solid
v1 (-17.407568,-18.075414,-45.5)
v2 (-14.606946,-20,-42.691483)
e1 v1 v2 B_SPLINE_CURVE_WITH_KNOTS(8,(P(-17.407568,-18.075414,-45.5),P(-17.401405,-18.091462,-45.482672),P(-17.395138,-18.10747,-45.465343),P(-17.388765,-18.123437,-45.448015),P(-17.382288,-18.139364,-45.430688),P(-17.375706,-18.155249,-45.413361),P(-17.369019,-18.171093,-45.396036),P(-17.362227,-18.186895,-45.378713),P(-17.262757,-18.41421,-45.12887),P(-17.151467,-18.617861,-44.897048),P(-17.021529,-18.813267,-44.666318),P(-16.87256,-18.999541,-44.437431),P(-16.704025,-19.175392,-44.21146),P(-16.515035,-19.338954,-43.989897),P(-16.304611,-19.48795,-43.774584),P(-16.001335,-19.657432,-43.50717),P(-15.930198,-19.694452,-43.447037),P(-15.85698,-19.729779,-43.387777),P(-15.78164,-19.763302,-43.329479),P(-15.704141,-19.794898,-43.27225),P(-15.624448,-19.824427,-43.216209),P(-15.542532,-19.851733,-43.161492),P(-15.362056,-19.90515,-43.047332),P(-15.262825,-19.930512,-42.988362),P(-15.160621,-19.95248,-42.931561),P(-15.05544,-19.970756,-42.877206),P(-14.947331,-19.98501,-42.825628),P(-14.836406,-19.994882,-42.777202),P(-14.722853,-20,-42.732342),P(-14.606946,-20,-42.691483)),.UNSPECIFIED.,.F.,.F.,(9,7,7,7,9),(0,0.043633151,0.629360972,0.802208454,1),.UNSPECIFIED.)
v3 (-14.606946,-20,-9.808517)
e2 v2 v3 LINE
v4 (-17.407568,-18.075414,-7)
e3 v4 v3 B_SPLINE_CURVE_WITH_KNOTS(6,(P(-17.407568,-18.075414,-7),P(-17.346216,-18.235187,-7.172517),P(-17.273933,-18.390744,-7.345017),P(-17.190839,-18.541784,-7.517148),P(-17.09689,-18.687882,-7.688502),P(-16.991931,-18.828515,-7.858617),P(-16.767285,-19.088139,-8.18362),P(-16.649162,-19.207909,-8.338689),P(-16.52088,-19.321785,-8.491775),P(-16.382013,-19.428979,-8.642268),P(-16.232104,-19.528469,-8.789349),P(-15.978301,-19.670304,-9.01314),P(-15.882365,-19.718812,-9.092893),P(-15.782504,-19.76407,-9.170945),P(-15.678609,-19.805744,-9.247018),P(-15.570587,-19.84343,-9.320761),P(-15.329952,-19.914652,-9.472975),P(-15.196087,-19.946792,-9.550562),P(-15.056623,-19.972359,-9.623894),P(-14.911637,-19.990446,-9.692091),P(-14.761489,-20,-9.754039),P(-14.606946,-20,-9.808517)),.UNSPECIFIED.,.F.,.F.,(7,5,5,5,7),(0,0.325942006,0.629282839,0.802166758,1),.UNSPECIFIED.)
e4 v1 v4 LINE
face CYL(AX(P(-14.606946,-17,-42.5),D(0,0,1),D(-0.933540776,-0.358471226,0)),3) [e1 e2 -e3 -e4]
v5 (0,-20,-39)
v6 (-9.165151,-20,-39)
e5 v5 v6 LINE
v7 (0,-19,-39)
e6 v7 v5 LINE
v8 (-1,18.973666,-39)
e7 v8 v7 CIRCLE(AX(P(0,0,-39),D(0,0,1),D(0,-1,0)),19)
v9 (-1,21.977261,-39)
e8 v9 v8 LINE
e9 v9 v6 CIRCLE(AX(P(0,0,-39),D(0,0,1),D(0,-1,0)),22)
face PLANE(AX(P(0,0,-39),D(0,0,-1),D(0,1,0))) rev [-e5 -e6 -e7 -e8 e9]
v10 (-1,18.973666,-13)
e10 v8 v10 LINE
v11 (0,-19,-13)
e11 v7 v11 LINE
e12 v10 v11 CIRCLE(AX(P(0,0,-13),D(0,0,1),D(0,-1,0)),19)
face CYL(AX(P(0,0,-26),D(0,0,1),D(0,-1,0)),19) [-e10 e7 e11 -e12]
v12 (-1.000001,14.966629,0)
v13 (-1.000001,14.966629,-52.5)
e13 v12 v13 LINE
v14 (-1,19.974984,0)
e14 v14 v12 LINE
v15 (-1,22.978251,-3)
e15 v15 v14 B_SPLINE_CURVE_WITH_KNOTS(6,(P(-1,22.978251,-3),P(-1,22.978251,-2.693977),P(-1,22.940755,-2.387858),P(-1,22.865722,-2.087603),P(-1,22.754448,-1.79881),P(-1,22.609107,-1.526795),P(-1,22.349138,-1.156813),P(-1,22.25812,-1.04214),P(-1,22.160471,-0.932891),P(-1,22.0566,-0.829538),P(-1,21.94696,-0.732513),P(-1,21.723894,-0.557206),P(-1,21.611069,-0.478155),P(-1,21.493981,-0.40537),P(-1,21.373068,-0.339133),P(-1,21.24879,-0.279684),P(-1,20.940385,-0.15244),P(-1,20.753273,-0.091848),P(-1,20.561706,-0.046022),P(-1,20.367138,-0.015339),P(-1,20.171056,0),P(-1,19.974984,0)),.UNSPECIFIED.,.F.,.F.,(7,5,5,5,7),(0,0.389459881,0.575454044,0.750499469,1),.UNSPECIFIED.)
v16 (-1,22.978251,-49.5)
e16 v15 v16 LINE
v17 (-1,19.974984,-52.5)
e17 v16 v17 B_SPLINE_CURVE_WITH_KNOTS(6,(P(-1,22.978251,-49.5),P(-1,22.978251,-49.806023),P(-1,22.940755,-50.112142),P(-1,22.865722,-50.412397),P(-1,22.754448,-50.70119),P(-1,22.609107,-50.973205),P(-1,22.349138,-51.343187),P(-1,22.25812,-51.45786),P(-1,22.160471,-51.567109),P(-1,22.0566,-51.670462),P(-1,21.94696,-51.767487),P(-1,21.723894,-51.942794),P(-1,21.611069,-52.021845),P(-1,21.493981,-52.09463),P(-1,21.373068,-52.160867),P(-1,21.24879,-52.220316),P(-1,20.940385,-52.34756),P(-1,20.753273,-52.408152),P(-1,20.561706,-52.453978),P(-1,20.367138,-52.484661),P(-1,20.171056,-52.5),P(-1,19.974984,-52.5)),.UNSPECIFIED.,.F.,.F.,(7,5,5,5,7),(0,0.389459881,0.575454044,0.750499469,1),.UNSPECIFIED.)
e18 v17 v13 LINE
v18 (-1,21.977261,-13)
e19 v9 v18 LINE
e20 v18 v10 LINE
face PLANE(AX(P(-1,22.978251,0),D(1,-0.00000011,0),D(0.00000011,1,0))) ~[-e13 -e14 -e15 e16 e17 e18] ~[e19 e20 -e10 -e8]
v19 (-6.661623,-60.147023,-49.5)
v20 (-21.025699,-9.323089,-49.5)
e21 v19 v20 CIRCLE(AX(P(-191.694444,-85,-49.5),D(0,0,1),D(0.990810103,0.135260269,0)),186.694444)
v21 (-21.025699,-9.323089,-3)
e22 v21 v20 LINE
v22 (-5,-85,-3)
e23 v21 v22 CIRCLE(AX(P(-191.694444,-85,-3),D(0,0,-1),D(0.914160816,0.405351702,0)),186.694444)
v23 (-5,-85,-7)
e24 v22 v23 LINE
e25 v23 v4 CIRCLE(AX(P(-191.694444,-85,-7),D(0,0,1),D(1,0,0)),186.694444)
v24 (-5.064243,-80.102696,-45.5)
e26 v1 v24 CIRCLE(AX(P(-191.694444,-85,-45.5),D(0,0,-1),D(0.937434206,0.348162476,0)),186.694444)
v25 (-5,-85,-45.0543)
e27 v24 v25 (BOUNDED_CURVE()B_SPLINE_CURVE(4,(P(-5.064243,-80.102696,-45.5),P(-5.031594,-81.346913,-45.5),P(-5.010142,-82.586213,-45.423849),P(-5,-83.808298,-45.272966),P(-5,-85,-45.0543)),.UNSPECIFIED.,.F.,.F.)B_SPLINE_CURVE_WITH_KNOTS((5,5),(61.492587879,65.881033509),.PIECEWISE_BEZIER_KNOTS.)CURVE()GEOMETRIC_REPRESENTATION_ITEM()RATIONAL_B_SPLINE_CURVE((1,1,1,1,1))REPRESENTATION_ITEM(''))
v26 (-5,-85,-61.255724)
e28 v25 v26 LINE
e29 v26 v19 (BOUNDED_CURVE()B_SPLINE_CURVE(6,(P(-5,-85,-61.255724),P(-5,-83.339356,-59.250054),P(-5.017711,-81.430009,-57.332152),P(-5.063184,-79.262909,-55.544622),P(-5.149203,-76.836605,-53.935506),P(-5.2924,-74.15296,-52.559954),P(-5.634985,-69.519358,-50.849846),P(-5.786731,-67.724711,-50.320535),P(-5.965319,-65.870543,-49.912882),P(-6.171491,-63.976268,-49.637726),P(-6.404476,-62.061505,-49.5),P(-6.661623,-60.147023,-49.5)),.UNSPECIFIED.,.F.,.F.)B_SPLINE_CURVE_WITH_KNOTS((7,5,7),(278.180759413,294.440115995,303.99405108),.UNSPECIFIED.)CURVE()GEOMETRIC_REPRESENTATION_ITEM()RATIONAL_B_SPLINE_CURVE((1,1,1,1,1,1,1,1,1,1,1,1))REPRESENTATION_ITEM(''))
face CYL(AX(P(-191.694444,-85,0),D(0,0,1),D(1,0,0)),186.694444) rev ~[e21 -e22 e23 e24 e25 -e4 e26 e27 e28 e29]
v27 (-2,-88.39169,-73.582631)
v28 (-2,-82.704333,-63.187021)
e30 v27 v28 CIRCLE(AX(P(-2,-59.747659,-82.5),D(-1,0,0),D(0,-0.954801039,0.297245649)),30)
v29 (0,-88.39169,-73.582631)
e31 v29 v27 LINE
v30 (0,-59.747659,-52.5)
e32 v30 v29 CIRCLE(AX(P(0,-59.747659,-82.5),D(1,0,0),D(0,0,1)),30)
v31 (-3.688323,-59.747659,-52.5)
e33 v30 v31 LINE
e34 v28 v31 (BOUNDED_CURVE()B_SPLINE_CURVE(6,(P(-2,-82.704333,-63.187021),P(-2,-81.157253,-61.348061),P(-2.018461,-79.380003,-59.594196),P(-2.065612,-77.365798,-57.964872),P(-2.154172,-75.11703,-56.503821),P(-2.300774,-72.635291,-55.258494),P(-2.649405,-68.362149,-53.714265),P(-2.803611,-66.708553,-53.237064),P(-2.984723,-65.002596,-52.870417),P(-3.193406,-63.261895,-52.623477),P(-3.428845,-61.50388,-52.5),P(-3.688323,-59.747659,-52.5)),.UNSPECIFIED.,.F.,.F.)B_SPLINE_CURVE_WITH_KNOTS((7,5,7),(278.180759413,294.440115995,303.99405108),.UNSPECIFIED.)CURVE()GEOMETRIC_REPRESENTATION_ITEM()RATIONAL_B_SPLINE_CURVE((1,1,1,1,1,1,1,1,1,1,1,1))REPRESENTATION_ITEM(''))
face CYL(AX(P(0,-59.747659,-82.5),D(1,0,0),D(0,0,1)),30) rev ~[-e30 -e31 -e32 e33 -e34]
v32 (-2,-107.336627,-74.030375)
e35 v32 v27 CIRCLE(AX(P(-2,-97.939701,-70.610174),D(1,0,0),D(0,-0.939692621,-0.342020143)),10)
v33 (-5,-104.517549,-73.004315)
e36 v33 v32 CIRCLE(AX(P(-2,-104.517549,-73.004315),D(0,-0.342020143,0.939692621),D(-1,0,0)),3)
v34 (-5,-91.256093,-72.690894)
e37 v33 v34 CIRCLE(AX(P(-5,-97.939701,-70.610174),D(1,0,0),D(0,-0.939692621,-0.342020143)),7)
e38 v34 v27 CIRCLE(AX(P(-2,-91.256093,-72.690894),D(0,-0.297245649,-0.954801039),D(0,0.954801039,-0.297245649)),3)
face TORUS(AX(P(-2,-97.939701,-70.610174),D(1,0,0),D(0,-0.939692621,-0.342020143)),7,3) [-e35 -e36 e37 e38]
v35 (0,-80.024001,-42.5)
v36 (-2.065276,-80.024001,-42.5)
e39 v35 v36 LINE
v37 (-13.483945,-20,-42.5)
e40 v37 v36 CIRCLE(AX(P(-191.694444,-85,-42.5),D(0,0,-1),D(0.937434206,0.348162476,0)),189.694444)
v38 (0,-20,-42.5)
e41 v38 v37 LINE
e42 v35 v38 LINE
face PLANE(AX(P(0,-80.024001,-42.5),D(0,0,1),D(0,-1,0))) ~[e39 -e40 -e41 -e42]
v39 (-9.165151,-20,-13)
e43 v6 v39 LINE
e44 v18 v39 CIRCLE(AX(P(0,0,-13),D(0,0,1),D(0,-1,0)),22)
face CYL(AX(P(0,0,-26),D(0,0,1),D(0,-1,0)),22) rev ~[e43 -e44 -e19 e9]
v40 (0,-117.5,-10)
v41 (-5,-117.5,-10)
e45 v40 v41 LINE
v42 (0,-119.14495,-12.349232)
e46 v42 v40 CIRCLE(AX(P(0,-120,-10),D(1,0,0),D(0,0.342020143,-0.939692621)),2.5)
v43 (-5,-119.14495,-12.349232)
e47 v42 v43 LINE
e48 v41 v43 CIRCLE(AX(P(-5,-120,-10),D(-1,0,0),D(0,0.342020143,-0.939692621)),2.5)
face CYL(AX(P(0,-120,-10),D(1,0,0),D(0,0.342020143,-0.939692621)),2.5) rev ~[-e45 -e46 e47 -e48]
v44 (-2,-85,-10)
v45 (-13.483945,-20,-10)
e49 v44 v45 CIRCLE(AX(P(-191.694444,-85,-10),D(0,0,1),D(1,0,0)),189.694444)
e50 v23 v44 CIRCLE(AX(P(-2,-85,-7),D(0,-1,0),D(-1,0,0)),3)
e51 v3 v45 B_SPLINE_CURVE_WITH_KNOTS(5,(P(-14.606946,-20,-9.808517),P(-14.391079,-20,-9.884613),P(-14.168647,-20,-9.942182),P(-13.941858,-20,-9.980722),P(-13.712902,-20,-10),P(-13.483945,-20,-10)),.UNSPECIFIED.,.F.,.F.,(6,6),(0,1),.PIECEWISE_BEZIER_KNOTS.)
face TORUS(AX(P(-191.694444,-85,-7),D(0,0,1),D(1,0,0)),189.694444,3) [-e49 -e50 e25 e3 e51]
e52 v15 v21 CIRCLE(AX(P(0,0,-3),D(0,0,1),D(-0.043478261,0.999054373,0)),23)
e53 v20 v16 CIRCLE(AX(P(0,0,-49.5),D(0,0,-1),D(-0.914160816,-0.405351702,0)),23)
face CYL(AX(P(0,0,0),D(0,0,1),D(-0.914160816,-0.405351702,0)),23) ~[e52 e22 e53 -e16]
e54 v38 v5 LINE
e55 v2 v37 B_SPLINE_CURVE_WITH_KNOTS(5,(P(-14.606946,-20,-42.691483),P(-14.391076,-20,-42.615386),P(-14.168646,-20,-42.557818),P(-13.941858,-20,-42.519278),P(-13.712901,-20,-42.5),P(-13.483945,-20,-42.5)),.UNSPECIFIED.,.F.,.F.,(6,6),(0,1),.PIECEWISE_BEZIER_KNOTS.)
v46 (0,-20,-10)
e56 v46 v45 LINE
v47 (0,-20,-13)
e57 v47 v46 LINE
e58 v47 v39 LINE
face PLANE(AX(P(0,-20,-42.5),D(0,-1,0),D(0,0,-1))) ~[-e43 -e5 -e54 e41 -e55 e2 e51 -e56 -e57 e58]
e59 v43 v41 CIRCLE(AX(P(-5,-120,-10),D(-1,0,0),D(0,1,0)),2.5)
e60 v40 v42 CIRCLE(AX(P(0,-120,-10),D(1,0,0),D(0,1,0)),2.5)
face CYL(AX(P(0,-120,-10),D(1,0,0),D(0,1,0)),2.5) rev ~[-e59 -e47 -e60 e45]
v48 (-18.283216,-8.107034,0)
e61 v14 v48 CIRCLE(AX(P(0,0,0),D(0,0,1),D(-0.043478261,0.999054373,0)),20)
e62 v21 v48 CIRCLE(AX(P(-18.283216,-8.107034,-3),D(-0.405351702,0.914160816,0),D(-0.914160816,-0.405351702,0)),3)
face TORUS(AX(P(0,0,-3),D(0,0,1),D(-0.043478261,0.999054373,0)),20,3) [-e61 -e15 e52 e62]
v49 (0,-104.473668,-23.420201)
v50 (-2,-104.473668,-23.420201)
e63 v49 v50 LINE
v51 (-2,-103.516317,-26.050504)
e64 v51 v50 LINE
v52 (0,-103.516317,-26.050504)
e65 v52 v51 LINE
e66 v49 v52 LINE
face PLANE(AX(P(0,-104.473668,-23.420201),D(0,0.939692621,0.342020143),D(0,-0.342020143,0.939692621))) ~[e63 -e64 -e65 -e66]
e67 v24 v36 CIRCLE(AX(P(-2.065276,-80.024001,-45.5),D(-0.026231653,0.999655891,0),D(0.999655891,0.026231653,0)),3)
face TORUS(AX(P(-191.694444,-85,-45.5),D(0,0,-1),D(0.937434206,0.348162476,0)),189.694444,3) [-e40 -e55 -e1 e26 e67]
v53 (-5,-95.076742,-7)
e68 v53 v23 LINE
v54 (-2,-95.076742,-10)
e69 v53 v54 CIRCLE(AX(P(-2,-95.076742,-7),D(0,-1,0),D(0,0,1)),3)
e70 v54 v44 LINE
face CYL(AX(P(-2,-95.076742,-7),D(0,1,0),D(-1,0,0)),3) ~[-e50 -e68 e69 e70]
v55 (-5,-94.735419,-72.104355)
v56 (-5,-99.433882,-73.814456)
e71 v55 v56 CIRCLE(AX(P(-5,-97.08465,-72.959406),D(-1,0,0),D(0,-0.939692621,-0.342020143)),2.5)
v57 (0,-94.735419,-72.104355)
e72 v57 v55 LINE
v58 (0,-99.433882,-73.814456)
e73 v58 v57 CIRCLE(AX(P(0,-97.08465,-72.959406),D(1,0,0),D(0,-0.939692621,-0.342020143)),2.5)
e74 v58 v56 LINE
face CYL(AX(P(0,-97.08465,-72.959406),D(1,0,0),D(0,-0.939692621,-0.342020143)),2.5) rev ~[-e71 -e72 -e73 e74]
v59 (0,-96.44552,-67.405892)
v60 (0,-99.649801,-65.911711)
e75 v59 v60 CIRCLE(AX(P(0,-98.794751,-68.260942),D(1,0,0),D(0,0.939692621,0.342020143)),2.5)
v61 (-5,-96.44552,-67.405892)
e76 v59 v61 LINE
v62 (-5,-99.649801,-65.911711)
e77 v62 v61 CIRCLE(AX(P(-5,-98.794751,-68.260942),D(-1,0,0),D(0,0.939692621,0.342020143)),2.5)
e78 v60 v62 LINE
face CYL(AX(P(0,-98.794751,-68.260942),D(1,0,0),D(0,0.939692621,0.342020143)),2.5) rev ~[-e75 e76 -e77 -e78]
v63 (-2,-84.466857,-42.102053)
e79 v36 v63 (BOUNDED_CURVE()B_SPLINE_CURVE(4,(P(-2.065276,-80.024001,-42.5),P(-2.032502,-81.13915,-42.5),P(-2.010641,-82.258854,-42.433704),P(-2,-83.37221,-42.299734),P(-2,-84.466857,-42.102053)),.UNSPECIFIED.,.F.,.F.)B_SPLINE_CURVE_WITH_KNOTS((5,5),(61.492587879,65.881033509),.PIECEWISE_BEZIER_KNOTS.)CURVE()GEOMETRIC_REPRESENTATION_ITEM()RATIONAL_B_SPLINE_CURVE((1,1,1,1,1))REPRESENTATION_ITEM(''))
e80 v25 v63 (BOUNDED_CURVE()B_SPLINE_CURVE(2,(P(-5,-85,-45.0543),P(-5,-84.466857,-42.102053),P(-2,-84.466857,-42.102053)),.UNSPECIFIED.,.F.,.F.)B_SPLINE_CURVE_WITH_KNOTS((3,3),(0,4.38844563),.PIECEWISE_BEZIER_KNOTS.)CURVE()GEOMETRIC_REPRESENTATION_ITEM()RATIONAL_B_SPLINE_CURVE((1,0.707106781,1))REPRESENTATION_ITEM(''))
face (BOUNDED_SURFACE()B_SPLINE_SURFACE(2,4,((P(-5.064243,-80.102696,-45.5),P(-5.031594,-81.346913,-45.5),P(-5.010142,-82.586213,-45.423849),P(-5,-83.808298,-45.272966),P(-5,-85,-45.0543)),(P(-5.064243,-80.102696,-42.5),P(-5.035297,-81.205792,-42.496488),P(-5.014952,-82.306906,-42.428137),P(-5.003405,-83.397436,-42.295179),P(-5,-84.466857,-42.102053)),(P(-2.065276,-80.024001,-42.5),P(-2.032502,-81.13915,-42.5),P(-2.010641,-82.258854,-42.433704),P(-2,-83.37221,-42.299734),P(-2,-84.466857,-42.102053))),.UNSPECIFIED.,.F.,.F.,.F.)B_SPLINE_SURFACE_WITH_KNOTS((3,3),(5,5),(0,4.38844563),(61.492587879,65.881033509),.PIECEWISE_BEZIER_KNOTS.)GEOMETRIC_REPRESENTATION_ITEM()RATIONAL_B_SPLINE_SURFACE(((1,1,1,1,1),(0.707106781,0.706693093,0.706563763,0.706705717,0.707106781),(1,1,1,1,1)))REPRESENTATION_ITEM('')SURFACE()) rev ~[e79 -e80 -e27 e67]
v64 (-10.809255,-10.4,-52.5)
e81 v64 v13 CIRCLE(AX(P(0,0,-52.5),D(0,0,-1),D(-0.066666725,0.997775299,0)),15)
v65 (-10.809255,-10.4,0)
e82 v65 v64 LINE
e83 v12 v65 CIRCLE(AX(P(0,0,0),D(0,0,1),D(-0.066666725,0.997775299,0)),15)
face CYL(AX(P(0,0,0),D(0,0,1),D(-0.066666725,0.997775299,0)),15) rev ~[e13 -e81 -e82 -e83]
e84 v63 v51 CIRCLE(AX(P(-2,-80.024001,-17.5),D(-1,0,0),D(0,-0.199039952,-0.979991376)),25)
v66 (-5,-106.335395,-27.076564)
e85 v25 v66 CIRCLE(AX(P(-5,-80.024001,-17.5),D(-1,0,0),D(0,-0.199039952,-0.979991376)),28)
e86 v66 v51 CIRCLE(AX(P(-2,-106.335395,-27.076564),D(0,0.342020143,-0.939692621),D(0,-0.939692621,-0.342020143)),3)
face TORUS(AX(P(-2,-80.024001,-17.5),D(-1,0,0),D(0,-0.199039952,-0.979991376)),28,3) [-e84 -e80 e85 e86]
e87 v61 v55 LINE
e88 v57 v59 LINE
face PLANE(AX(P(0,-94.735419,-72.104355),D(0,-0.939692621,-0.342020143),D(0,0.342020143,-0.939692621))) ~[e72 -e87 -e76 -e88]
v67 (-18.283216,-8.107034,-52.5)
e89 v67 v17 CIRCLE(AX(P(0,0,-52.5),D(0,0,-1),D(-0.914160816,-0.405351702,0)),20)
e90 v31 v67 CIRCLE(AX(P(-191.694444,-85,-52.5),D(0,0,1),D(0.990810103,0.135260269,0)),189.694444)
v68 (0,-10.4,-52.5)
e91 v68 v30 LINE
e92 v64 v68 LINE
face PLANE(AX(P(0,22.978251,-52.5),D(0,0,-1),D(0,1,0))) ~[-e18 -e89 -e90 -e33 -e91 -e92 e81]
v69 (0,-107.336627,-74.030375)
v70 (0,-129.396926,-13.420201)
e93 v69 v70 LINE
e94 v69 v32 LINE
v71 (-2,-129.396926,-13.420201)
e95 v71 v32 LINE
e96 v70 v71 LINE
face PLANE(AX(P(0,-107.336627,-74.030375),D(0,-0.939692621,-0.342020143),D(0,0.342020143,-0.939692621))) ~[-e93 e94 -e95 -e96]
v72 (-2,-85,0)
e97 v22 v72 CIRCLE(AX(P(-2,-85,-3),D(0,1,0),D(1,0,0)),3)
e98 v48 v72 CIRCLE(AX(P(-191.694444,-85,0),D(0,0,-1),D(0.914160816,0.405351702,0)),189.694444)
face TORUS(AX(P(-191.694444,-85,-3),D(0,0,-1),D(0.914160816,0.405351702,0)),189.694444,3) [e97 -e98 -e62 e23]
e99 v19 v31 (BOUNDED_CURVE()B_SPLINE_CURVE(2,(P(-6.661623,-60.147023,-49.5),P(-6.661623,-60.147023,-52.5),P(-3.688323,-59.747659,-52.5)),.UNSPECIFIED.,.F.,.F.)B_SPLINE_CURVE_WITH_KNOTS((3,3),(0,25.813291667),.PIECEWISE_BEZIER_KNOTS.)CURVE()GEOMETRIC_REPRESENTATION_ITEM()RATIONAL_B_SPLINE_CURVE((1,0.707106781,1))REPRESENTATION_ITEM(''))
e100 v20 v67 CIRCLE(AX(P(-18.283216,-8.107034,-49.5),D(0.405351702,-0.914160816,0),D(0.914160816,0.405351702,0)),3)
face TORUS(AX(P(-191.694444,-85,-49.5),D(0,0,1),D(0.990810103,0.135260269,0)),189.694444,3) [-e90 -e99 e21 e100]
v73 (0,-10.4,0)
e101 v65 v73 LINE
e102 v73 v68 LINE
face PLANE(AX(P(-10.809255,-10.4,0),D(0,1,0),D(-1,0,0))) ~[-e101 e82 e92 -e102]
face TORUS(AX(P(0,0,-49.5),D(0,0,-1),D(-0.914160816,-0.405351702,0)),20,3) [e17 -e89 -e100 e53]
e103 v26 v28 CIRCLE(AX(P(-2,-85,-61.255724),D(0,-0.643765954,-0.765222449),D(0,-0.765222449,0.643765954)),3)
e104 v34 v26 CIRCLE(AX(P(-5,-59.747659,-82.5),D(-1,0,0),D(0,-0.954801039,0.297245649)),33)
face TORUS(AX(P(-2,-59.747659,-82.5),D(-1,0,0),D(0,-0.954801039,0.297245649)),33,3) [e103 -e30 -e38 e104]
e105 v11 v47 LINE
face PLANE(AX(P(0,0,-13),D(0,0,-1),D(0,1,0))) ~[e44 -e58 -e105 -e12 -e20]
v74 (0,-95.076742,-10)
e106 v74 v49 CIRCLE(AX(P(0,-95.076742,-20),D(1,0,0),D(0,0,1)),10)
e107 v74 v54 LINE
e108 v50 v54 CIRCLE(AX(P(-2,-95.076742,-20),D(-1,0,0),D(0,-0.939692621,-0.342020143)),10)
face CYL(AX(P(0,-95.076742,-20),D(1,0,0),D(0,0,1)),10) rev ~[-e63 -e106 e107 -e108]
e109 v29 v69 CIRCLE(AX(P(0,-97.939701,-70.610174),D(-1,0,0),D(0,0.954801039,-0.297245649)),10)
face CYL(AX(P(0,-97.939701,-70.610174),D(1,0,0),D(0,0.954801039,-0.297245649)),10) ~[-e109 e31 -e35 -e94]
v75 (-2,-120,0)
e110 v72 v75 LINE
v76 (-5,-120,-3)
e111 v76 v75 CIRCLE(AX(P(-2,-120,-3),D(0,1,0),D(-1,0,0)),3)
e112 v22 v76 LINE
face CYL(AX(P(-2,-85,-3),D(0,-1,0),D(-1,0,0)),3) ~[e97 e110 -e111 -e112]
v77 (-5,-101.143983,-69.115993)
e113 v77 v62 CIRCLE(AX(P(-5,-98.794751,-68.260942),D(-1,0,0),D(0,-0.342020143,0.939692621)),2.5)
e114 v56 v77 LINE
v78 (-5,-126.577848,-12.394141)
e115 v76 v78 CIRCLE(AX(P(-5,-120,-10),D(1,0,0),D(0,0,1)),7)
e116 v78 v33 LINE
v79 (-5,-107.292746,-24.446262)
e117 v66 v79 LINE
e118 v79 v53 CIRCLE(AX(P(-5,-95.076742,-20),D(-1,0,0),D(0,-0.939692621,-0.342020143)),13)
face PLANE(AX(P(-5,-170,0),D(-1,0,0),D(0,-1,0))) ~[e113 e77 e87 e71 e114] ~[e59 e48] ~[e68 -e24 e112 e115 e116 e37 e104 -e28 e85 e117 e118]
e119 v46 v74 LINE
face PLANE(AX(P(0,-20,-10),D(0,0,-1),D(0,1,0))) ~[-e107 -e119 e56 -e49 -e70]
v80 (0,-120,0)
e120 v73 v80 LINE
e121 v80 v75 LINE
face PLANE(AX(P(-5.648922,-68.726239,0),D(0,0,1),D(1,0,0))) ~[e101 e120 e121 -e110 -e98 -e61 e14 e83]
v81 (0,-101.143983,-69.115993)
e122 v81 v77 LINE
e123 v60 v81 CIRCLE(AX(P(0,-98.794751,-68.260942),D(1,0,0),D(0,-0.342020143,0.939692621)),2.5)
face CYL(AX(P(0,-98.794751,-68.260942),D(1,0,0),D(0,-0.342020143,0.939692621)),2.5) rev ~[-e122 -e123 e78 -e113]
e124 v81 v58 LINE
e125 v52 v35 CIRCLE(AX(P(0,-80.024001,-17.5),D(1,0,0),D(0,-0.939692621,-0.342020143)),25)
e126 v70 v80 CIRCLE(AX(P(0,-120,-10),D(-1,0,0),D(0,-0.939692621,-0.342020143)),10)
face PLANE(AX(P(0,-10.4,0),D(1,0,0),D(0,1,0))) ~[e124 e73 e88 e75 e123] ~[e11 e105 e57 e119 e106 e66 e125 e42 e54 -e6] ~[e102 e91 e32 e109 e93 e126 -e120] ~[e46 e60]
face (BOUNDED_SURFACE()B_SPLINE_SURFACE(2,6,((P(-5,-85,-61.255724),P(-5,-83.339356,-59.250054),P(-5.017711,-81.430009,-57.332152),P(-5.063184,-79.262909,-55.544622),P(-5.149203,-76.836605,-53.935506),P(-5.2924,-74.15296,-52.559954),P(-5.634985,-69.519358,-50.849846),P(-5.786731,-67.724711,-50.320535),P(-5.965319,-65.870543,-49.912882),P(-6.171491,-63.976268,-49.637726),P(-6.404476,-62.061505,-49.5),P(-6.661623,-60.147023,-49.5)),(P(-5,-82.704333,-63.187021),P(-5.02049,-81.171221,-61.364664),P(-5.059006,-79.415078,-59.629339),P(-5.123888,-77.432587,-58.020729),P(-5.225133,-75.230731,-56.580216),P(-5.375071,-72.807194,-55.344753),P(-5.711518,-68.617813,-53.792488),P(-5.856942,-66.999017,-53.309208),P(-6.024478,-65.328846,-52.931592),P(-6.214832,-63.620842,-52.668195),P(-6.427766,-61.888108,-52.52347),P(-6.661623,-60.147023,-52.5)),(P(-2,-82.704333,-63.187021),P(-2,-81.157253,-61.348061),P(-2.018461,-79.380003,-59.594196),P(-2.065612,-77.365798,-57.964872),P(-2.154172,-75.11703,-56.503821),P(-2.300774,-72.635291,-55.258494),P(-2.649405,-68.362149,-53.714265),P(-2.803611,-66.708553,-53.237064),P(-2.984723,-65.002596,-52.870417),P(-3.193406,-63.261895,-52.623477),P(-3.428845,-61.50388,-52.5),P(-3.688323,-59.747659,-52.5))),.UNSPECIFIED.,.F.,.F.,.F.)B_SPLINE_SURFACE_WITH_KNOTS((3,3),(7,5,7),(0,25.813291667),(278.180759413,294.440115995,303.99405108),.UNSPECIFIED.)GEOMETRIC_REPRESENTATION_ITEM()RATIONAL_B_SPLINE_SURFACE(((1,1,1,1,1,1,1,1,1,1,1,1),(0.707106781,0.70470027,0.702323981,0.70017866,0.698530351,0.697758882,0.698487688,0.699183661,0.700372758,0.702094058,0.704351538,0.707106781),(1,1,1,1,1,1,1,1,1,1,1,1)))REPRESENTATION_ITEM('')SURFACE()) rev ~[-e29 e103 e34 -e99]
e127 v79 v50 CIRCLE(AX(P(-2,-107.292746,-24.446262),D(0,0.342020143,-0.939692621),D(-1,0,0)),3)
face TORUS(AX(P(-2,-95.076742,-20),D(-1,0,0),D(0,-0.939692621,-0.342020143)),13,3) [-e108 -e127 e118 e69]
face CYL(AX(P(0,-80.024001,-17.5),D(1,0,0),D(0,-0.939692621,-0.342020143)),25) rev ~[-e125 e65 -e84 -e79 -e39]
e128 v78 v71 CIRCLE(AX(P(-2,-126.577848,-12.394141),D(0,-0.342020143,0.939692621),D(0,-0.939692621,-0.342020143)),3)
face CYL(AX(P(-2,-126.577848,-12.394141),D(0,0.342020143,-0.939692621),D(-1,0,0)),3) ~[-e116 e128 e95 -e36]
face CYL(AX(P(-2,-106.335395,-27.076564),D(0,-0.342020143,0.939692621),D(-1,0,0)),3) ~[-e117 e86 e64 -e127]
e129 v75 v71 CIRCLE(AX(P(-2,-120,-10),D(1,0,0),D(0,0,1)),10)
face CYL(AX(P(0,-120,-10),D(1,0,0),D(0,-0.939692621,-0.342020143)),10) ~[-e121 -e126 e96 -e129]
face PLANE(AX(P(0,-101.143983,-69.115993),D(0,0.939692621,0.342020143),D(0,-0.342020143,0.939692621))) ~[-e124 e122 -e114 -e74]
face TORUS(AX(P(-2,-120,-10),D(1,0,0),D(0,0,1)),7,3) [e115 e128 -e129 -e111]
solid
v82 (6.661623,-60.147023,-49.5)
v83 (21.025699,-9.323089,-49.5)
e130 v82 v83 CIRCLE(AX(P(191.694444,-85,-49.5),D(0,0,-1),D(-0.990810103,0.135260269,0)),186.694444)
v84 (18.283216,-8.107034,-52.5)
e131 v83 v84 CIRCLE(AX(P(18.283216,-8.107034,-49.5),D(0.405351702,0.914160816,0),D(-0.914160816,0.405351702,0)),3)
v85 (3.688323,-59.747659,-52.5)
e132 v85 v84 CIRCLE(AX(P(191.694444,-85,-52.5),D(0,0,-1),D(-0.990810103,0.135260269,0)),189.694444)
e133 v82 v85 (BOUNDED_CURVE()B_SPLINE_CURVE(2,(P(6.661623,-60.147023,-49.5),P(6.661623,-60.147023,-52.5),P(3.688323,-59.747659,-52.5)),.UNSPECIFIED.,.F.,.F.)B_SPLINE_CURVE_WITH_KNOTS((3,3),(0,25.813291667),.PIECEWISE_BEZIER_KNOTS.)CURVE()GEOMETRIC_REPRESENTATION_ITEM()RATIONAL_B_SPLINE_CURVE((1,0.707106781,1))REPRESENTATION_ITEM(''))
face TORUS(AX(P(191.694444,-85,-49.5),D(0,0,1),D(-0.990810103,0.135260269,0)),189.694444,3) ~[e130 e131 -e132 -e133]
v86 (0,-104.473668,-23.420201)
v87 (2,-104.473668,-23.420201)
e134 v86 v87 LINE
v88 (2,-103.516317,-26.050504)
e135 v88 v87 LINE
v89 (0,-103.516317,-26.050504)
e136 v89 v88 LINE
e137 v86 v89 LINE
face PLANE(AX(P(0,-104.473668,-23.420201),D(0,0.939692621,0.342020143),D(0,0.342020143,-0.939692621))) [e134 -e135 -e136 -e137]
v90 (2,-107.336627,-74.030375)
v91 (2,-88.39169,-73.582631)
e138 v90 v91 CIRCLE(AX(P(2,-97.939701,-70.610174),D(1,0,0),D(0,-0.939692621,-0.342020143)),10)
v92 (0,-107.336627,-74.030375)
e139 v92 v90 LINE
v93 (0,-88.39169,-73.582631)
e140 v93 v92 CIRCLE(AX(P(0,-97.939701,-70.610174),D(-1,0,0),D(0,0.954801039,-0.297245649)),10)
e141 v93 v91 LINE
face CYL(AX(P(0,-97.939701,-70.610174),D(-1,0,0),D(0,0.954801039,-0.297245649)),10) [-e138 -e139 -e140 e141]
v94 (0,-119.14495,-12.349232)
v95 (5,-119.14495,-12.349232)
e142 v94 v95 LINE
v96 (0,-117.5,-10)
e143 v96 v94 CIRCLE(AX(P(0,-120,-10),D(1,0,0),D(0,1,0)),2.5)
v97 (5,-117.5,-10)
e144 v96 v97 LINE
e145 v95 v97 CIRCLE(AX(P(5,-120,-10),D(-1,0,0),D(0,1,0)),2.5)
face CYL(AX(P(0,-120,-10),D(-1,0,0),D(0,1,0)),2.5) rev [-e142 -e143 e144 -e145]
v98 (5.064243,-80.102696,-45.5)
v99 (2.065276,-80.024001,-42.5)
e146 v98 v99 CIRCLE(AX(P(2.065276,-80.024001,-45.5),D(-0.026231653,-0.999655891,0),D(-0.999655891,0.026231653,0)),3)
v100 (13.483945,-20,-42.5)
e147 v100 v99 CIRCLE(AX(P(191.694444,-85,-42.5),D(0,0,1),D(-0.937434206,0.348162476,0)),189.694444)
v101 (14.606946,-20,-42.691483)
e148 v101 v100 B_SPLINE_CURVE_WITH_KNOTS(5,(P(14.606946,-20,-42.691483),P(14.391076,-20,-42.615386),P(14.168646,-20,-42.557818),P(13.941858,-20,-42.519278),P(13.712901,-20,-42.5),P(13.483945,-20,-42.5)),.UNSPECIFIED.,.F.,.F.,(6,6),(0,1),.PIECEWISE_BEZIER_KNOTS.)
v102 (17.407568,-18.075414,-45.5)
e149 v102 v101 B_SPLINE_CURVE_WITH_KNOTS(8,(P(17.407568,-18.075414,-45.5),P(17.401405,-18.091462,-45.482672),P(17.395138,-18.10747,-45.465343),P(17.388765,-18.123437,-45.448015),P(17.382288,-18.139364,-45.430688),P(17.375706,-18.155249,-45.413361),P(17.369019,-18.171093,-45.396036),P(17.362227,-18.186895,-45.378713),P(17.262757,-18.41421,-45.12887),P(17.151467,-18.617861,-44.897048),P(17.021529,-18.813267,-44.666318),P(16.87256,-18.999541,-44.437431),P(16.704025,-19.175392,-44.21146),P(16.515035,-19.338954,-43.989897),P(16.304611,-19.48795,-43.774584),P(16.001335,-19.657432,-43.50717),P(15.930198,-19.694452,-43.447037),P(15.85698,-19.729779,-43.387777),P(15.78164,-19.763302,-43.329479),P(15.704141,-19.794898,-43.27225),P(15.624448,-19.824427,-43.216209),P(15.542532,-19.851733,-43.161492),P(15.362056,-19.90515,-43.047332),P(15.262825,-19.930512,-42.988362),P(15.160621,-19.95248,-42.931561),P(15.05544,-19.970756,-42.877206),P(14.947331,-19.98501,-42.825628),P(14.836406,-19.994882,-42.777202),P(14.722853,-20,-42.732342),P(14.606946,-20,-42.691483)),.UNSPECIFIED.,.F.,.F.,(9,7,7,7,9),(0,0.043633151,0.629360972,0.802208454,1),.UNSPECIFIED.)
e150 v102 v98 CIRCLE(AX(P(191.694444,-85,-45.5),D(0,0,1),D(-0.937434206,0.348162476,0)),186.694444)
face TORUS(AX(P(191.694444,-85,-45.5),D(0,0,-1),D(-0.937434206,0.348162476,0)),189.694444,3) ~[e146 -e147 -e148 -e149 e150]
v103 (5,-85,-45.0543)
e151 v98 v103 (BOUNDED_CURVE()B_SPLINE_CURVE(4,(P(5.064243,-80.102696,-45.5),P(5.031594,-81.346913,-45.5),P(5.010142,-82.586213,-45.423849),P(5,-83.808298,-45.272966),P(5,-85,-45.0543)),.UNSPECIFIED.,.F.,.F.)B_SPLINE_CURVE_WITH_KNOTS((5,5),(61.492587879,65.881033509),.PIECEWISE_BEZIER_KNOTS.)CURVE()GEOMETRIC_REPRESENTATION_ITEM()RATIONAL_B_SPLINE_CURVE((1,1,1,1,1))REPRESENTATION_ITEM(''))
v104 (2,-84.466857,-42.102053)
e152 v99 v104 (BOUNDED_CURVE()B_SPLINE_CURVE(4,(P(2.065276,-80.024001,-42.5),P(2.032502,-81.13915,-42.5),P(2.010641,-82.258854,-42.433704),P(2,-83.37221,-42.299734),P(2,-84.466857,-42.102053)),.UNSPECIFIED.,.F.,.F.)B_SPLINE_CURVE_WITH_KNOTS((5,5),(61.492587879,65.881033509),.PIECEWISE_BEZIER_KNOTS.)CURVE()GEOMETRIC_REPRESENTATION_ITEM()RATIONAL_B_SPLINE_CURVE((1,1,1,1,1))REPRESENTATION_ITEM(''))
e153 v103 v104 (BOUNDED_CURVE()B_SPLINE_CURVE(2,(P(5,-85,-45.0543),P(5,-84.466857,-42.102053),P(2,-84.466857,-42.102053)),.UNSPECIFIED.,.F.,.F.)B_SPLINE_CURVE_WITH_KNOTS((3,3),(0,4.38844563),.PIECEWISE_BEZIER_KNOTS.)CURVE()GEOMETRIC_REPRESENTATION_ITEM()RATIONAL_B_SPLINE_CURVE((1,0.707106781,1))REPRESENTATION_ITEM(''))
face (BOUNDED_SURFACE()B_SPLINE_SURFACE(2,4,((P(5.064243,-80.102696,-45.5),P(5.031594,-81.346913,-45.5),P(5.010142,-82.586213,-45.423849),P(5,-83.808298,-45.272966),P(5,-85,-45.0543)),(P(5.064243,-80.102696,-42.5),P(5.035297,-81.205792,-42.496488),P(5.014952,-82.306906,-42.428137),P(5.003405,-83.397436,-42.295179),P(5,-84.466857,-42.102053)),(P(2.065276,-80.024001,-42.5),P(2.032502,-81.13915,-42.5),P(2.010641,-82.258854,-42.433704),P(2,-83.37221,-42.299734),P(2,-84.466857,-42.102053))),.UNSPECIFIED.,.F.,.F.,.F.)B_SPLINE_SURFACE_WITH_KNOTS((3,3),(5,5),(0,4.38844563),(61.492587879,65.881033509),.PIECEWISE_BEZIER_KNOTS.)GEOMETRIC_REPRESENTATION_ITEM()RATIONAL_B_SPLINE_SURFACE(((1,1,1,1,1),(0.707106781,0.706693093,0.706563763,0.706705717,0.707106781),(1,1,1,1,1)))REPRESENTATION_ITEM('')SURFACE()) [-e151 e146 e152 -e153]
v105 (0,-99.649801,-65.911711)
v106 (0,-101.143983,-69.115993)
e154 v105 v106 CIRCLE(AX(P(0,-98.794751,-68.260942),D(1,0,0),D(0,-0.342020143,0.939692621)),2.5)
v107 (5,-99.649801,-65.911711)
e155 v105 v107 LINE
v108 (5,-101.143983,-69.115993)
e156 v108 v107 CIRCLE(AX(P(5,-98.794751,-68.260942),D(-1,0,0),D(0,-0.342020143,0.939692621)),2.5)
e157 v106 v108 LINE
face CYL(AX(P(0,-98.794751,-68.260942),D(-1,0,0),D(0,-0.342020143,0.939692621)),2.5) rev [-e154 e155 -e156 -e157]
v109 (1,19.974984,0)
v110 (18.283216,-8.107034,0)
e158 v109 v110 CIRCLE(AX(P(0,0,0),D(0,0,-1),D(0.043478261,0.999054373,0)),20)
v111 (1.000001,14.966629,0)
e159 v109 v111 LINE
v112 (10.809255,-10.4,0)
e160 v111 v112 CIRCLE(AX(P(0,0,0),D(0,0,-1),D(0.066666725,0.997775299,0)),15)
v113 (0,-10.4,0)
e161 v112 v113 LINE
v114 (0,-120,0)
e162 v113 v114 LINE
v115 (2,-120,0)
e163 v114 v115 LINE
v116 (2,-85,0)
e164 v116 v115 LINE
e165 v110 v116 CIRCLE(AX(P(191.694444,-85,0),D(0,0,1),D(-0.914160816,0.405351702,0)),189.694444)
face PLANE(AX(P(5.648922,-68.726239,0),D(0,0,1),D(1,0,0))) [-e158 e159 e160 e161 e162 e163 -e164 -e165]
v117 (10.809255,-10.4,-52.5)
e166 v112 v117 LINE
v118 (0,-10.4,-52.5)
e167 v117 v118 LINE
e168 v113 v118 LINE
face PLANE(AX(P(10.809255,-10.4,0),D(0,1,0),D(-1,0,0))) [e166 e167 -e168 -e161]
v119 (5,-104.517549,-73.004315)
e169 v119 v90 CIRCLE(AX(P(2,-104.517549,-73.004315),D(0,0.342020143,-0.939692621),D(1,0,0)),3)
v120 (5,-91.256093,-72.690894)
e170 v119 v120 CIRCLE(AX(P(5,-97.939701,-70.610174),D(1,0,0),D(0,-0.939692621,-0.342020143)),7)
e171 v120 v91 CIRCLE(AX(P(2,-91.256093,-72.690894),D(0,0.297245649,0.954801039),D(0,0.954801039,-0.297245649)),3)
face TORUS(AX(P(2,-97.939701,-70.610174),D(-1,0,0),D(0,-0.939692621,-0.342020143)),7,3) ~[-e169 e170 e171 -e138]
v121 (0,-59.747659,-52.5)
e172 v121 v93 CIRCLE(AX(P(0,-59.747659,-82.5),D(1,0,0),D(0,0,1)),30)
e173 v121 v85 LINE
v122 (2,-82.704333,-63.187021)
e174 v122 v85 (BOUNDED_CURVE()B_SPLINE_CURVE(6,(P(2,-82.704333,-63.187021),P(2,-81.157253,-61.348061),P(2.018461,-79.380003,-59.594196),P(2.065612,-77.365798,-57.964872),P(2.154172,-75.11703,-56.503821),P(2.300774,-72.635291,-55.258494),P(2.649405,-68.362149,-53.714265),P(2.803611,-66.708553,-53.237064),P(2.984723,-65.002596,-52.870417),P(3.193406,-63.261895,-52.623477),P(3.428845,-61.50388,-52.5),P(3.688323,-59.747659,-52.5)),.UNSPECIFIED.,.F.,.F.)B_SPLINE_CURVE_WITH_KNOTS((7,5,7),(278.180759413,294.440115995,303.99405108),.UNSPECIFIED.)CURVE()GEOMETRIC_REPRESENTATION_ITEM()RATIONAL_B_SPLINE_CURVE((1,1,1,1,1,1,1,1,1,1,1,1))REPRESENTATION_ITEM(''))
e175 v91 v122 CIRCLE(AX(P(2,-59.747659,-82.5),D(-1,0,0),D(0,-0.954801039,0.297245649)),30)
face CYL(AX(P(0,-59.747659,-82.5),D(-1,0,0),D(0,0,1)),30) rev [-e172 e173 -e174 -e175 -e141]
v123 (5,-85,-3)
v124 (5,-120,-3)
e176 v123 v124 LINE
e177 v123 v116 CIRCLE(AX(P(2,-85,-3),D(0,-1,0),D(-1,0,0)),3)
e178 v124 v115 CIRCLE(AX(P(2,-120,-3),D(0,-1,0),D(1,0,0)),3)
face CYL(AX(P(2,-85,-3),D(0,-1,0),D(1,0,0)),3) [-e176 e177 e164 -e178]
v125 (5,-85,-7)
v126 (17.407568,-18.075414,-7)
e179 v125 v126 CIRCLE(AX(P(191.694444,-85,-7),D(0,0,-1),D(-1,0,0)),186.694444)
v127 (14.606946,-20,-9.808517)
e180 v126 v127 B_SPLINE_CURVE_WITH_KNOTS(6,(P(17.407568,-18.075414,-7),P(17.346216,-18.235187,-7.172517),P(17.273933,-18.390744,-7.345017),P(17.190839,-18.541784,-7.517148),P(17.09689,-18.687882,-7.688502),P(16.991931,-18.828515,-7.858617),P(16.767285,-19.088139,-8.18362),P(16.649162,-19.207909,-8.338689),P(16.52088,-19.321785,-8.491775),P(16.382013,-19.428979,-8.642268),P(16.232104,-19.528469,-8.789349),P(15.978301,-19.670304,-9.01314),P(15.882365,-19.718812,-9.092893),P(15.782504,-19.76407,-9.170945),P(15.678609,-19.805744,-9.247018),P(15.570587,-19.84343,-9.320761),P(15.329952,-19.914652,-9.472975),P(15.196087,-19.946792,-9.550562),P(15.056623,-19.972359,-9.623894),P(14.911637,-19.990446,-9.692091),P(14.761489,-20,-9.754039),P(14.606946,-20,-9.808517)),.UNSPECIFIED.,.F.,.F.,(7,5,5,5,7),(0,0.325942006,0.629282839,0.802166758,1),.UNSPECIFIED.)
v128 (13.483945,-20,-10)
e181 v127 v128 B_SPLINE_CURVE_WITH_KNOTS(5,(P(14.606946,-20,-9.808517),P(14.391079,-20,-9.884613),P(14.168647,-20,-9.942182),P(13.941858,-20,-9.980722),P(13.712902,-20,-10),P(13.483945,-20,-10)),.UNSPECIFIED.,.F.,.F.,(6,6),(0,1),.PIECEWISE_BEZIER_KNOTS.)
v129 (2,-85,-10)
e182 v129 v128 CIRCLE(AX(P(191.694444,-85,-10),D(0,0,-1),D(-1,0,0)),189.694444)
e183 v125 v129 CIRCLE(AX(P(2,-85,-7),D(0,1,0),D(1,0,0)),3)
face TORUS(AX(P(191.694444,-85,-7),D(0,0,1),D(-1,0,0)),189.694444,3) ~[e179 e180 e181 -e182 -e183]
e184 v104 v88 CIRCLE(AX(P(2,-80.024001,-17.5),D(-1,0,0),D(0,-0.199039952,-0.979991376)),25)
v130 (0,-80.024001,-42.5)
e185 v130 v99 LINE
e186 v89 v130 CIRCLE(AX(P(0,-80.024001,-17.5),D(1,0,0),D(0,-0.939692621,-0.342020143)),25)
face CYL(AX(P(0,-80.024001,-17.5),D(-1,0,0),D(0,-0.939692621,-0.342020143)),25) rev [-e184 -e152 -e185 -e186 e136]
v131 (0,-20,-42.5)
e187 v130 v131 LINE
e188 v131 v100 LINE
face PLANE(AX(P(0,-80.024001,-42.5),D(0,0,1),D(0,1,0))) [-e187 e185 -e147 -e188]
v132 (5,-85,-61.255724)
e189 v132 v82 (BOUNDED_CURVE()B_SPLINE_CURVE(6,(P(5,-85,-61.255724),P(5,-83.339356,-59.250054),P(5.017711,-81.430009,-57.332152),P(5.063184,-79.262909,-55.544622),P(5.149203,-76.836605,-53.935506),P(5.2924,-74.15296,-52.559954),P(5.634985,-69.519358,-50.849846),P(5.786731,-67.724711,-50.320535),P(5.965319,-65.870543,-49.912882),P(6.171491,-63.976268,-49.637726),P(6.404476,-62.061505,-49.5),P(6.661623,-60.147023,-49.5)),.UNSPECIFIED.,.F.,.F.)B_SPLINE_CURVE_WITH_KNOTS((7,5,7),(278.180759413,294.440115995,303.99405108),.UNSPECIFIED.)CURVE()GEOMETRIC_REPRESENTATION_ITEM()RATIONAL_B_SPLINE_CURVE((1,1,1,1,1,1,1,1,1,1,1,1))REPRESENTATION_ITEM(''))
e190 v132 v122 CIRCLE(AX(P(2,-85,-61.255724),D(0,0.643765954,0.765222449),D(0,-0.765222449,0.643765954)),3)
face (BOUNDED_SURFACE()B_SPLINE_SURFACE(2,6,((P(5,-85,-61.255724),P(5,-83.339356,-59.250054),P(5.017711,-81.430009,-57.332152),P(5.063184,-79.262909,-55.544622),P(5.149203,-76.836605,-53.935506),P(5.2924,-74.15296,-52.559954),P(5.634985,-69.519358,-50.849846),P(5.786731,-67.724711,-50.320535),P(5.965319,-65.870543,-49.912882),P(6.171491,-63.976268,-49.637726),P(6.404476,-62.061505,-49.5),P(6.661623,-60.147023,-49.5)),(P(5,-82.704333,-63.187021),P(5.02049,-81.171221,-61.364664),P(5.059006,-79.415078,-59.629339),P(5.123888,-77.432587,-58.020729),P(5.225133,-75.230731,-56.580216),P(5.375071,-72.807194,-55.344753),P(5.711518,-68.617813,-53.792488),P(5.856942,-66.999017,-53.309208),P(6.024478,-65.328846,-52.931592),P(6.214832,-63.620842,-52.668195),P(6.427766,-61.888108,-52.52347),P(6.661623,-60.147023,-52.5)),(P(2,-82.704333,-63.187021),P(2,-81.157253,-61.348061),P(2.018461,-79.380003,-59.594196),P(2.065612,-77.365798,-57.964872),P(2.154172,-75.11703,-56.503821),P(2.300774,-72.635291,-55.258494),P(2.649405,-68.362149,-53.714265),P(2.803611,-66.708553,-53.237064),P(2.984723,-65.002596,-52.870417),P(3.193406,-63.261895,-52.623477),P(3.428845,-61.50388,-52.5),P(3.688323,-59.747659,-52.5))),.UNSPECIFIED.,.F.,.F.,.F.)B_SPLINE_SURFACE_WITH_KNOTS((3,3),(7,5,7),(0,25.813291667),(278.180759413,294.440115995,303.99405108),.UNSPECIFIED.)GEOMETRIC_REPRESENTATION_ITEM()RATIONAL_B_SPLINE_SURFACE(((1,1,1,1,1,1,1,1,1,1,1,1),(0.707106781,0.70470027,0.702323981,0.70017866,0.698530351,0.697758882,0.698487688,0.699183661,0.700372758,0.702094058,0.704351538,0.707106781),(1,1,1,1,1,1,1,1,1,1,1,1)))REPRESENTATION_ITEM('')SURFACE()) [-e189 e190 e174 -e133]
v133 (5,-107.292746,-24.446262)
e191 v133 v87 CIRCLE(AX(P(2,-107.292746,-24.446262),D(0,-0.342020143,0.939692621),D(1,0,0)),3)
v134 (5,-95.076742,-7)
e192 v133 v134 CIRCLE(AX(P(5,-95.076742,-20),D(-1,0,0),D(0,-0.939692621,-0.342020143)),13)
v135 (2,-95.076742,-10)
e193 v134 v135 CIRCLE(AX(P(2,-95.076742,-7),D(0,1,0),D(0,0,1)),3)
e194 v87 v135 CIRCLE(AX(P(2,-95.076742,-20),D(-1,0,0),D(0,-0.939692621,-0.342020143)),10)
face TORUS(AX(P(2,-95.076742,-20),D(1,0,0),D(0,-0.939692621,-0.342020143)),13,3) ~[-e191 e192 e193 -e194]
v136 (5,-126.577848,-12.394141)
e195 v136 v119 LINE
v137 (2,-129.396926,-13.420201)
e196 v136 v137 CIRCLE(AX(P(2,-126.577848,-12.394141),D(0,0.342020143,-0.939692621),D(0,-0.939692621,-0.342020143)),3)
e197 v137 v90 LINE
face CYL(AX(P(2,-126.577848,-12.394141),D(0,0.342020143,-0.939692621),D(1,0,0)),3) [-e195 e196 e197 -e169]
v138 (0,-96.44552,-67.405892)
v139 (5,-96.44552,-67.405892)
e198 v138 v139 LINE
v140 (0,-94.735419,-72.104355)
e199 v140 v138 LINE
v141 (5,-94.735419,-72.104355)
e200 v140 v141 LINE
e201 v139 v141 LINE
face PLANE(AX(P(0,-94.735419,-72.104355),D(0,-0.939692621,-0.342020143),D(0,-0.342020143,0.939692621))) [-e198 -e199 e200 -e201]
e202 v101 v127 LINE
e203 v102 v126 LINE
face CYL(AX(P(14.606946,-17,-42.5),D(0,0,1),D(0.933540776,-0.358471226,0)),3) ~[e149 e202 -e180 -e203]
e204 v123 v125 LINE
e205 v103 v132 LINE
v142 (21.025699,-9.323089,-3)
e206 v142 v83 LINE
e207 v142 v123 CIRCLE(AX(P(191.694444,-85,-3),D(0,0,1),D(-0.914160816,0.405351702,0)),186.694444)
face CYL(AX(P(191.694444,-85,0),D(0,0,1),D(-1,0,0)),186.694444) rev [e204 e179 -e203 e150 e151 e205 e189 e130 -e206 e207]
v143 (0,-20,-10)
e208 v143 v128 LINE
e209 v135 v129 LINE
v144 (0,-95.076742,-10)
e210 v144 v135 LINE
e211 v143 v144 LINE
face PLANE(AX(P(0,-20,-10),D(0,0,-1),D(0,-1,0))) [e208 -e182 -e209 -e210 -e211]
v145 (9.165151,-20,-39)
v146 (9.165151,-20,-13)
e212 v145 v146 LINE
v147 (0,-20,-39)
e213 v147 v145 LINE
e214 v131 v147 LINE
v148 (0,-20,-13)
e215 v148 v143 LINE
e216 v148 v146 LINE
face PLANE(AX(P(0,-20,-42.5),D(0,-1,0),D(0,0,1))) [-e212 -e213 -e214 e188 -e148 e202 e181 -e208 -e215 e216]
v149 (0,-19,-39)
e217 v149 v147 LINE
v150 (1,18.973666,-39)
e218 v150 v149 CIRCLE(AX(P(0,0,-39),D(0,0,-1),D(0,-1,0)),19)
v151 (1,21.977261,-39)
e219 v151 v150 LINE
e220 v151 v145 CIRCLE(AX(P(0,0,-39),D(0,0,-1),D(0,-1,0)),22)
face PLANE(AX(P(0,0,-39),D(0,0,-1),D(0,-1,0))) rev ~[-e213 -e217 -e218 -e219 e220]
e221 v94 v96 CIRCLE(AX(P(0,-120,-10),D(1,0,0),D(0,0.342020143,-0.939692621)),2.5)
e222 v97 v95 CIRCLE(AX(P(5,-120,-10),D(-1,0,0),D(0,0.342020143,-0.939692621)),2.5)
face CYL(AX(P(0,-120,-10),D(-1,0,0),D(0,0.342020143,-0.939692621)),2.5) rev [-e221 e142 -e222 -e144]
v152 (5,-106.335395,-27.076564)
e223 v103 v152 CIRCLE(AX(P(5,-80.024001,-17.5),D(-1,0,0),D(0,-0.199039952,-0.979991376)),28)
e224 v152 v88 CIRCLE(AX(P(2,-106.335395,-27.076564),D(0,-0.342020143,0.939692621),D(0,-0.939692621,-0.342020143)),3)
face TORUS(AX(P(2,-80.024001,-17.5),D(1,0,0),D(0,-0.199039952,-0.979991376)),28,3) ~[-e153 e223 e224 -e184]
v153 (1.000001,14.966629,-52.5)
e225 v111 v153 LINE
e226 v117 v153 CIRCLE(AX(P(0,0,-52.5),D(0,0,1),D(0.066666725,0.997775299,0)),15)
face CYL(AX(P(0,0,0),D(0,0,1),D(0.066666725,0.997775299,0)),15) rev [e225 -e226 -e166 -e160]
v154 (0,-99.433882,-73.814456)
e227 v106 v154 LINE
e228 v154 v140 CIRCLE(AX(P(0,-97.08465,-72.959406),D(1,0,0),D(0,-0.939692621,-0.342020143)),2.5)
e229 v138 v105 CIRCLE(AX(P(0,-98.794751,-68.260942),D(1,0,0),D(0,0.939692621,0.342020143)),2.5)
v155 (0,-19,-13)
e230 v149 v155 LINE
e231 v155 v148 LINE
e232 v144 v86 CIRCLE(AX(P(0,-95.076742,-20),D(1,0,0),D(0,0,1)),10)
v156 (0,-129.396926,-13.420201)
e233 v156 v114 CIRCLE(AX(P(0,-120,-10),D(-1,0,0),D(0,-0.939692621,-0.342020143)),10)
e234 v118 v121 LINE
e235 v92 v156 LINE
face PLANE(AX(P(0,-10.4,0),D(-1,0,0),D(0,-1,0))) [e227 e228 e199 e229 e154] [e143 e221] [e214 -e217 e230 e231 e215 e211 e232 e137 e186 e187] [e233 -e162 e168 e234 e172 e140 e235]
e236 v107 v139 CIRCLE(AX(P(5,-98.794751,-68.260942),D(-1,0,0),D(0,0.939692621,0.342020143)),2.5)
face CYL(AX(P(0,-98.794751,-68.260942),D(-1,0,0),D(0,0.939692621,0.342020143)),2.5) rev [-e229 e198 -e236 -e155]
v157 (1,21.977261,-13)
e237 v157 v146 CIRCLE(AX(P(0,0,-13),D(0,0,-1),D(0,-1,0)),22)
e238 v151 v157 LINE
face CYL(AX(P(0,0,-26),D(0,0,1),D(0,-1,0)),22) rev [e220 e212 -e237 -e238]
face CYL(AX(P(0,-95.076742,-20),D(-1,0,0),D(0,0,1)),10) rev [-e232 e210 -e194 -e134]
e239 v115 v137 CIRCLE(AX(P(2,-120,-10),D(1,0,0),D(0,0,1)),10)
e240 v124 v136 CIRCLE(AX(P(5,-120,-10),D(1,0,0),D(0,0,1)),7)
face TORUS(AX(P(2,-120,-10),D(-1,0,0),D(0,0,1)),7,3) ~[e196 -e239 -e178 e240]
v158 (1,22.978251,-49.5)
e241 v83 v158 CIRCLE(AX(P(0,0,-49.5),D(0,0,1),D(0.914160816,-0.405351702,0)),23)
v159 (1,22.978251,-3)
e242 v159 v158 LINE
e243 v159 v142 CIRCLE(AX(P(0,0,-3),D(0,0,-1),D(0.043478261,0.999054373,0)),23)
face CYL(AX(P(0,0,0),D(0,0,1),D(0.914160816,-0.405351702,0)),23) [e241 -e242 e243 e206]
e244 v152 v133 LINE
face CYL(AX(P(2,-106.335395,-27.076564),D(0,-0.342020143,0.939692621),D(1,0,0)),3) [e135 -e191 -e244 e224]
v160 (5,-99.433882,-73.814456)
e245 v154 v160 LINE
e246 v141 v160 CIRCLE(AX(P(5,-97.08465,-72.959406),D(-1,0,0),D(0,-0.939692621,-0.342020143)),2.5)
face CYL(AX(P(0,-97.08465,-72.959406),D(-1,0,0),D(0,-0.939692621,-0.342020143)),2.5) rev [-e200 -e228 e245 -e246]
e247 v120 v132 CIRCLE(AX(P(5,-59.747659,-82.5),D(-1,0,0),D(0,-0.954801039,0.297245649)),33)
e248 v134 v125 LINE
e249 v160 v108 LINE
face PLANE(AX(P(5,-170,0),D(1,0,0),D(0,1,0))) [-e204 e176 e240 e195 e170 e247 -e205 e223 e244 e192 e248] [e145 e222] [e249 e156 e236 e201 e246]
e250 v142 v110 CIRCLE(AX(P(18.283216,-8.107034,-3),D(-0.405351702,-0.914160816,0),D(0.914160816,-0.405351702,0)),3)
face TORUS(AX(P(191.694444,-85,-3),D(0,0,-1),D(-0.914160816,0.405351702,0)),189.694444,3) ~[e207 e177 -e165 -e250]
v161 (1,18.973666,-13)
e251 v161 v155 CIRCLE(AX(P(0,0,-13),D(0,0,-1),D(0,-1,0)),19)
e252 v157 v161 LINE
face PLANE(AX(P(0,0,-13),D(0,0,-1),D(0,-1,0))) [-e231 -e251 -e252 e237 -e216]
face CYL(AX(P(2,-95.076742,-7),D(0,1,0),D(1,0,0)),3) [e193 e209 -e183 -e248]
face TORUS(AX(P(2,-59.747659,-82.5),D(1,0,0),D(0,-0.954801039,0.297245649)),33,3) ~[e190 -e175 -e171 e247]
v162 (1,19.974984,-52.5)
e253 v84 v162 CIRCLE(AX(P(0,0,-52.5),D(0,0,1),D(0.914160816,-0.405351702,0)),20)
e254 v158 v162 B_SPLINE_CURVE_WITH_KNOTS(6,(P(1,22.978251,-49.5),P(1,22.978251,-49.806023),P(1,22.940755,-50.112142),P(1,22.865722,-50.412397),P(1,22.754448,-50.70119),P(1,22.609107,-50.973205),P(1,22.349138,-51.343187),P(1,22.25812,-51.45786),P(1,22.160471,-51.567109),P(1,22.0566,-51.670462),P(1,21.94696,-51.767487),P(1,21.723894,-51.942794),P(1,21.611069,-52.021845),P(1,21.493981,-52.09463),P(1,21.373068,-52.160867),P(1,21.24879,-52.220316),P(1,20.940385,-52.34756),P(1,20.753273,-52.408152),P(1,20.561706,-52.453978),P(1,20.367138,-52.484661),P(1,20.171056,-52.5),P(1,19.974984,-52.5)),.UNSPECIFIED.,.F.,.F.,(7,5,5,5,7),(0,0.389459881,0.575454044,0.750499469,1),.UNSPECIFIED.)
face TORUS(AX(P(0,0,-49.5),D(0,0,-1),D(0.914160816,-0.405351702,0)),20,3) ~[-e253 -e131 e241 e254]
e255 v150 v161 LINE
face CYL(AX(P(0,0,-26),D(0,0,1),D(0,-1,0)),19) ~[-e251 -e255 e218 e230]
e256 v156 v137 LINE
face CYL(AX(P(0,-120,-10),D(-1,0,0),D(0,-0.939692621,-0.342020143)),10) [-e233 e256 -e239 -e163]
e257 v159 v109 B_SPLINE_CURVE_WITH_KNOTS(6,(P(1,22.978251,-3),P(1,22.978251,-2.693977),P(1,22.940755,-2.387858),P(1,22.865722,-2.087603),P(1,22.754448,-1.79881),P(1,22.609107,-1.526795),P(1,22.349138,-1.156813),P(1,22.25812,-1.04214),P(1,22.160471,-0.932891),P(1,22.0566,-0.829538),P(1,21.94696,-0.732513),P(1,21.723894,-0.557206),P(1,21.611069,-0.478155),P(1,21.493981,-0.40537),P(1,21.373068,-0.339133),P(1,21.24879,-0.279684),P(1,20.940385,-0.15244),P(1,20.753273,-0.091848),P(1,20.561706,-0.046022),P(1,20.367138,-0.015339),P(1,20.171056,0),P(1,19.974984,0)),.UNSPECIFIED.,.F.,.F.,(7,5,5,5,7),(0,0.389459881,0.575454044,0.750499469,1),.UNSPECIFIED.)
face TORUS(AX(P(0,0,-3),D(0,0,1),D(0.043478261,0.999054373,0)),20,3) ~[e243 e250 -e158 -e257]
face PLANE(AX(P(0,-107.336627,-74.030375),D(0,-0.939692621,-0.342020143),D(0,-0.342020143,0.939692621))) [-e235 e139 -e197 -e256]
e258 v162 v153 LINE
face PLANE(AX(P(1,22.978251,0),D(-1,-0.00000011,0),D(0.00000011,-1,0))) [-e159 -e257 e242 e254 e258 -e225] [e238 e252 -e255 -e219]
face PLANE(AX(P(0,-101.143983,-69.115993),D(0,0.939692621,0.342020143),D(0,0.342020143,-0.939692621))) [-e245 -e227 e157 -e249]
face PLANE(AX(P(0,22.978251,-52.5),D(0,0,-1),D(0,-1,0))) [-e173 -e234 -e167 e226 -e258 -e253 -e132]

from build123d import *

# Parameters (mm, degrees)
F1_DEPTH = 100
F3_DEPTH = 23.001
F4_W     = 3
F4_H     = 26
F6_R     = 3


# Not quite as in the source:
# - ends of sketch curves that miss each other by under 0.0002 mm in the source are joined


with BuildPart() as f1:
    # F0 (on Top) → F1 (new body)
    with BuildSketch(Plane.XY):
        with BuildLine():
            ThreePointArc((1.0000008821, 14.9666294882), (13.990393338, 5.410073405), (10.8092552935, -10.4))
            Line((10.8092552935, -10.4), (0, -10.4))
            Line((0, -10.4), (0, -170))
            Line((0, -170), (5, -170))
            Line((5, -170), (5, -85))
            ThreePointArc((5, -85), (9.0503612601, -46.3224294433), (21.025698768, -9.3230891509))
            ThreePointArc((21.025698768, -9.3230891509), (19.5480686708, 12.1191175934), (1, 22.9782505862))
            Line((1, 22.9782505862), (1.0000008821, 14.9666294882))
        make_face()
    extrude(amount=-F1_DEPTH)

    # F2 (on Right) → F3 (cut, through all)
    with BuildSketch(Plane.YZ):
        with BuildLine():
            ThreePointArc((-119.1449496417, -12.349231552), (-117.9521198893, -11.4339410909), (-117.5, -10))
            ThreePointArc((-117.5, -10), (-122.0478801107, -8.5660589091), (-119.1449496417, -12.349231552))
        make_face()
        with BuildLine():
            ThreePointArc((-96.4455195618, -67.4058921304), (-97.7382054595, -65.9951730211), (-99.6498014721, -65.9117109368))
            ThreePointArc((-99.6498014721, -65.9117109368), (-101.0605205814, -67.2043968344), (-101.1439826658, -69.115992847))
            Line((-101.1439826658, -69.115992847), (-99.4338819491, -73.814455951))
            ThreePointArc((-99.4338819491, -73.814455951), (-96.2296000389, -75.3086371446), (-94.7354188452, -72.1043552343))
            Line((-94.7354188452, -72.1043552343), (-96.4455195618, -67.4058921304))
        make_face()
        with BuildLine():
            Line((-104.4736684157, -23.4202014333), (-103.516316726, -26.0505035831))
            ThreePointArc((-103.516316726, -26.0505035831), (-94.3634121151, -37.9788011072), (-80.0240012063, -42.5))
            Line((-80.0240012063, -42.5), (-20, -42.5))
            Line((-20, -42.5), (-20, -10))
            Line((-20, -10), (-95.0767422078, -10))
            ThreePointArc((-95.0767422078, -10), (-103.2682626507, -14.2642356365), (-104.4736684157, -23.4202014333))
        make_face()
        with BuildLine():
            Line((-170, 0), (-170, -100))
            Line((-170, -100), (22.9782505862, -100))
            Line((22.9782505862, -100), (22.9782505862, -52.5))
            Line((22.9782505862, -52.5), (-59.7476591937, -52.5))
            ThreePointArc((-59.7476591937, -52.5), (-77.5307820341, -58.3388629812), (-88.391690365, -73.5826305305))
            ThreePointArc((-88.391690365, -73.5826305305), (-97.7034265691, -80.6073823765), (-107.3366269634, -74.0303754739))
            Line((-107.3366269634, -74.0303754739), (-129.3969262079, -13.4202014333))
            ThreePointArc((-129.3969262079, -13.4202014333), (-128.1915204429, -4.2642356365), (-120, 0))
            Line((-120, 0), (-170, 0))
        make_face()
    extrude(amount=F3_DEPTH, mode=Mode.SUBTRACT)

    # F4 (on Right) → F5 (revolve, cut)
    with BuildSketch(Plane.YZ):
        with Locations((-20.5, -26)):
            Rectangle(F4_W, F4_H)
    revolve(axis=Axis((0, 0, -112.1668060077), (0, 0, -1)), mode=Mode.SUBTRACT)

    # F6
    f6_edges = [f1.edges().sort_by_distance(p)[0] for p in [
        (5, -118.366777, -43.725288),
        (8.399785, -49.533347, -42.5),
        (16.680686, -20, -26.25),
    ]]
    fillet(f6_edges, radius=F6_R)


with BuildPart() as f7_1:
    # F7: instance of F1
    add(f1.part.mirror(Plane.YZ))


solid = Compound([f1.part, f7_1.part])
